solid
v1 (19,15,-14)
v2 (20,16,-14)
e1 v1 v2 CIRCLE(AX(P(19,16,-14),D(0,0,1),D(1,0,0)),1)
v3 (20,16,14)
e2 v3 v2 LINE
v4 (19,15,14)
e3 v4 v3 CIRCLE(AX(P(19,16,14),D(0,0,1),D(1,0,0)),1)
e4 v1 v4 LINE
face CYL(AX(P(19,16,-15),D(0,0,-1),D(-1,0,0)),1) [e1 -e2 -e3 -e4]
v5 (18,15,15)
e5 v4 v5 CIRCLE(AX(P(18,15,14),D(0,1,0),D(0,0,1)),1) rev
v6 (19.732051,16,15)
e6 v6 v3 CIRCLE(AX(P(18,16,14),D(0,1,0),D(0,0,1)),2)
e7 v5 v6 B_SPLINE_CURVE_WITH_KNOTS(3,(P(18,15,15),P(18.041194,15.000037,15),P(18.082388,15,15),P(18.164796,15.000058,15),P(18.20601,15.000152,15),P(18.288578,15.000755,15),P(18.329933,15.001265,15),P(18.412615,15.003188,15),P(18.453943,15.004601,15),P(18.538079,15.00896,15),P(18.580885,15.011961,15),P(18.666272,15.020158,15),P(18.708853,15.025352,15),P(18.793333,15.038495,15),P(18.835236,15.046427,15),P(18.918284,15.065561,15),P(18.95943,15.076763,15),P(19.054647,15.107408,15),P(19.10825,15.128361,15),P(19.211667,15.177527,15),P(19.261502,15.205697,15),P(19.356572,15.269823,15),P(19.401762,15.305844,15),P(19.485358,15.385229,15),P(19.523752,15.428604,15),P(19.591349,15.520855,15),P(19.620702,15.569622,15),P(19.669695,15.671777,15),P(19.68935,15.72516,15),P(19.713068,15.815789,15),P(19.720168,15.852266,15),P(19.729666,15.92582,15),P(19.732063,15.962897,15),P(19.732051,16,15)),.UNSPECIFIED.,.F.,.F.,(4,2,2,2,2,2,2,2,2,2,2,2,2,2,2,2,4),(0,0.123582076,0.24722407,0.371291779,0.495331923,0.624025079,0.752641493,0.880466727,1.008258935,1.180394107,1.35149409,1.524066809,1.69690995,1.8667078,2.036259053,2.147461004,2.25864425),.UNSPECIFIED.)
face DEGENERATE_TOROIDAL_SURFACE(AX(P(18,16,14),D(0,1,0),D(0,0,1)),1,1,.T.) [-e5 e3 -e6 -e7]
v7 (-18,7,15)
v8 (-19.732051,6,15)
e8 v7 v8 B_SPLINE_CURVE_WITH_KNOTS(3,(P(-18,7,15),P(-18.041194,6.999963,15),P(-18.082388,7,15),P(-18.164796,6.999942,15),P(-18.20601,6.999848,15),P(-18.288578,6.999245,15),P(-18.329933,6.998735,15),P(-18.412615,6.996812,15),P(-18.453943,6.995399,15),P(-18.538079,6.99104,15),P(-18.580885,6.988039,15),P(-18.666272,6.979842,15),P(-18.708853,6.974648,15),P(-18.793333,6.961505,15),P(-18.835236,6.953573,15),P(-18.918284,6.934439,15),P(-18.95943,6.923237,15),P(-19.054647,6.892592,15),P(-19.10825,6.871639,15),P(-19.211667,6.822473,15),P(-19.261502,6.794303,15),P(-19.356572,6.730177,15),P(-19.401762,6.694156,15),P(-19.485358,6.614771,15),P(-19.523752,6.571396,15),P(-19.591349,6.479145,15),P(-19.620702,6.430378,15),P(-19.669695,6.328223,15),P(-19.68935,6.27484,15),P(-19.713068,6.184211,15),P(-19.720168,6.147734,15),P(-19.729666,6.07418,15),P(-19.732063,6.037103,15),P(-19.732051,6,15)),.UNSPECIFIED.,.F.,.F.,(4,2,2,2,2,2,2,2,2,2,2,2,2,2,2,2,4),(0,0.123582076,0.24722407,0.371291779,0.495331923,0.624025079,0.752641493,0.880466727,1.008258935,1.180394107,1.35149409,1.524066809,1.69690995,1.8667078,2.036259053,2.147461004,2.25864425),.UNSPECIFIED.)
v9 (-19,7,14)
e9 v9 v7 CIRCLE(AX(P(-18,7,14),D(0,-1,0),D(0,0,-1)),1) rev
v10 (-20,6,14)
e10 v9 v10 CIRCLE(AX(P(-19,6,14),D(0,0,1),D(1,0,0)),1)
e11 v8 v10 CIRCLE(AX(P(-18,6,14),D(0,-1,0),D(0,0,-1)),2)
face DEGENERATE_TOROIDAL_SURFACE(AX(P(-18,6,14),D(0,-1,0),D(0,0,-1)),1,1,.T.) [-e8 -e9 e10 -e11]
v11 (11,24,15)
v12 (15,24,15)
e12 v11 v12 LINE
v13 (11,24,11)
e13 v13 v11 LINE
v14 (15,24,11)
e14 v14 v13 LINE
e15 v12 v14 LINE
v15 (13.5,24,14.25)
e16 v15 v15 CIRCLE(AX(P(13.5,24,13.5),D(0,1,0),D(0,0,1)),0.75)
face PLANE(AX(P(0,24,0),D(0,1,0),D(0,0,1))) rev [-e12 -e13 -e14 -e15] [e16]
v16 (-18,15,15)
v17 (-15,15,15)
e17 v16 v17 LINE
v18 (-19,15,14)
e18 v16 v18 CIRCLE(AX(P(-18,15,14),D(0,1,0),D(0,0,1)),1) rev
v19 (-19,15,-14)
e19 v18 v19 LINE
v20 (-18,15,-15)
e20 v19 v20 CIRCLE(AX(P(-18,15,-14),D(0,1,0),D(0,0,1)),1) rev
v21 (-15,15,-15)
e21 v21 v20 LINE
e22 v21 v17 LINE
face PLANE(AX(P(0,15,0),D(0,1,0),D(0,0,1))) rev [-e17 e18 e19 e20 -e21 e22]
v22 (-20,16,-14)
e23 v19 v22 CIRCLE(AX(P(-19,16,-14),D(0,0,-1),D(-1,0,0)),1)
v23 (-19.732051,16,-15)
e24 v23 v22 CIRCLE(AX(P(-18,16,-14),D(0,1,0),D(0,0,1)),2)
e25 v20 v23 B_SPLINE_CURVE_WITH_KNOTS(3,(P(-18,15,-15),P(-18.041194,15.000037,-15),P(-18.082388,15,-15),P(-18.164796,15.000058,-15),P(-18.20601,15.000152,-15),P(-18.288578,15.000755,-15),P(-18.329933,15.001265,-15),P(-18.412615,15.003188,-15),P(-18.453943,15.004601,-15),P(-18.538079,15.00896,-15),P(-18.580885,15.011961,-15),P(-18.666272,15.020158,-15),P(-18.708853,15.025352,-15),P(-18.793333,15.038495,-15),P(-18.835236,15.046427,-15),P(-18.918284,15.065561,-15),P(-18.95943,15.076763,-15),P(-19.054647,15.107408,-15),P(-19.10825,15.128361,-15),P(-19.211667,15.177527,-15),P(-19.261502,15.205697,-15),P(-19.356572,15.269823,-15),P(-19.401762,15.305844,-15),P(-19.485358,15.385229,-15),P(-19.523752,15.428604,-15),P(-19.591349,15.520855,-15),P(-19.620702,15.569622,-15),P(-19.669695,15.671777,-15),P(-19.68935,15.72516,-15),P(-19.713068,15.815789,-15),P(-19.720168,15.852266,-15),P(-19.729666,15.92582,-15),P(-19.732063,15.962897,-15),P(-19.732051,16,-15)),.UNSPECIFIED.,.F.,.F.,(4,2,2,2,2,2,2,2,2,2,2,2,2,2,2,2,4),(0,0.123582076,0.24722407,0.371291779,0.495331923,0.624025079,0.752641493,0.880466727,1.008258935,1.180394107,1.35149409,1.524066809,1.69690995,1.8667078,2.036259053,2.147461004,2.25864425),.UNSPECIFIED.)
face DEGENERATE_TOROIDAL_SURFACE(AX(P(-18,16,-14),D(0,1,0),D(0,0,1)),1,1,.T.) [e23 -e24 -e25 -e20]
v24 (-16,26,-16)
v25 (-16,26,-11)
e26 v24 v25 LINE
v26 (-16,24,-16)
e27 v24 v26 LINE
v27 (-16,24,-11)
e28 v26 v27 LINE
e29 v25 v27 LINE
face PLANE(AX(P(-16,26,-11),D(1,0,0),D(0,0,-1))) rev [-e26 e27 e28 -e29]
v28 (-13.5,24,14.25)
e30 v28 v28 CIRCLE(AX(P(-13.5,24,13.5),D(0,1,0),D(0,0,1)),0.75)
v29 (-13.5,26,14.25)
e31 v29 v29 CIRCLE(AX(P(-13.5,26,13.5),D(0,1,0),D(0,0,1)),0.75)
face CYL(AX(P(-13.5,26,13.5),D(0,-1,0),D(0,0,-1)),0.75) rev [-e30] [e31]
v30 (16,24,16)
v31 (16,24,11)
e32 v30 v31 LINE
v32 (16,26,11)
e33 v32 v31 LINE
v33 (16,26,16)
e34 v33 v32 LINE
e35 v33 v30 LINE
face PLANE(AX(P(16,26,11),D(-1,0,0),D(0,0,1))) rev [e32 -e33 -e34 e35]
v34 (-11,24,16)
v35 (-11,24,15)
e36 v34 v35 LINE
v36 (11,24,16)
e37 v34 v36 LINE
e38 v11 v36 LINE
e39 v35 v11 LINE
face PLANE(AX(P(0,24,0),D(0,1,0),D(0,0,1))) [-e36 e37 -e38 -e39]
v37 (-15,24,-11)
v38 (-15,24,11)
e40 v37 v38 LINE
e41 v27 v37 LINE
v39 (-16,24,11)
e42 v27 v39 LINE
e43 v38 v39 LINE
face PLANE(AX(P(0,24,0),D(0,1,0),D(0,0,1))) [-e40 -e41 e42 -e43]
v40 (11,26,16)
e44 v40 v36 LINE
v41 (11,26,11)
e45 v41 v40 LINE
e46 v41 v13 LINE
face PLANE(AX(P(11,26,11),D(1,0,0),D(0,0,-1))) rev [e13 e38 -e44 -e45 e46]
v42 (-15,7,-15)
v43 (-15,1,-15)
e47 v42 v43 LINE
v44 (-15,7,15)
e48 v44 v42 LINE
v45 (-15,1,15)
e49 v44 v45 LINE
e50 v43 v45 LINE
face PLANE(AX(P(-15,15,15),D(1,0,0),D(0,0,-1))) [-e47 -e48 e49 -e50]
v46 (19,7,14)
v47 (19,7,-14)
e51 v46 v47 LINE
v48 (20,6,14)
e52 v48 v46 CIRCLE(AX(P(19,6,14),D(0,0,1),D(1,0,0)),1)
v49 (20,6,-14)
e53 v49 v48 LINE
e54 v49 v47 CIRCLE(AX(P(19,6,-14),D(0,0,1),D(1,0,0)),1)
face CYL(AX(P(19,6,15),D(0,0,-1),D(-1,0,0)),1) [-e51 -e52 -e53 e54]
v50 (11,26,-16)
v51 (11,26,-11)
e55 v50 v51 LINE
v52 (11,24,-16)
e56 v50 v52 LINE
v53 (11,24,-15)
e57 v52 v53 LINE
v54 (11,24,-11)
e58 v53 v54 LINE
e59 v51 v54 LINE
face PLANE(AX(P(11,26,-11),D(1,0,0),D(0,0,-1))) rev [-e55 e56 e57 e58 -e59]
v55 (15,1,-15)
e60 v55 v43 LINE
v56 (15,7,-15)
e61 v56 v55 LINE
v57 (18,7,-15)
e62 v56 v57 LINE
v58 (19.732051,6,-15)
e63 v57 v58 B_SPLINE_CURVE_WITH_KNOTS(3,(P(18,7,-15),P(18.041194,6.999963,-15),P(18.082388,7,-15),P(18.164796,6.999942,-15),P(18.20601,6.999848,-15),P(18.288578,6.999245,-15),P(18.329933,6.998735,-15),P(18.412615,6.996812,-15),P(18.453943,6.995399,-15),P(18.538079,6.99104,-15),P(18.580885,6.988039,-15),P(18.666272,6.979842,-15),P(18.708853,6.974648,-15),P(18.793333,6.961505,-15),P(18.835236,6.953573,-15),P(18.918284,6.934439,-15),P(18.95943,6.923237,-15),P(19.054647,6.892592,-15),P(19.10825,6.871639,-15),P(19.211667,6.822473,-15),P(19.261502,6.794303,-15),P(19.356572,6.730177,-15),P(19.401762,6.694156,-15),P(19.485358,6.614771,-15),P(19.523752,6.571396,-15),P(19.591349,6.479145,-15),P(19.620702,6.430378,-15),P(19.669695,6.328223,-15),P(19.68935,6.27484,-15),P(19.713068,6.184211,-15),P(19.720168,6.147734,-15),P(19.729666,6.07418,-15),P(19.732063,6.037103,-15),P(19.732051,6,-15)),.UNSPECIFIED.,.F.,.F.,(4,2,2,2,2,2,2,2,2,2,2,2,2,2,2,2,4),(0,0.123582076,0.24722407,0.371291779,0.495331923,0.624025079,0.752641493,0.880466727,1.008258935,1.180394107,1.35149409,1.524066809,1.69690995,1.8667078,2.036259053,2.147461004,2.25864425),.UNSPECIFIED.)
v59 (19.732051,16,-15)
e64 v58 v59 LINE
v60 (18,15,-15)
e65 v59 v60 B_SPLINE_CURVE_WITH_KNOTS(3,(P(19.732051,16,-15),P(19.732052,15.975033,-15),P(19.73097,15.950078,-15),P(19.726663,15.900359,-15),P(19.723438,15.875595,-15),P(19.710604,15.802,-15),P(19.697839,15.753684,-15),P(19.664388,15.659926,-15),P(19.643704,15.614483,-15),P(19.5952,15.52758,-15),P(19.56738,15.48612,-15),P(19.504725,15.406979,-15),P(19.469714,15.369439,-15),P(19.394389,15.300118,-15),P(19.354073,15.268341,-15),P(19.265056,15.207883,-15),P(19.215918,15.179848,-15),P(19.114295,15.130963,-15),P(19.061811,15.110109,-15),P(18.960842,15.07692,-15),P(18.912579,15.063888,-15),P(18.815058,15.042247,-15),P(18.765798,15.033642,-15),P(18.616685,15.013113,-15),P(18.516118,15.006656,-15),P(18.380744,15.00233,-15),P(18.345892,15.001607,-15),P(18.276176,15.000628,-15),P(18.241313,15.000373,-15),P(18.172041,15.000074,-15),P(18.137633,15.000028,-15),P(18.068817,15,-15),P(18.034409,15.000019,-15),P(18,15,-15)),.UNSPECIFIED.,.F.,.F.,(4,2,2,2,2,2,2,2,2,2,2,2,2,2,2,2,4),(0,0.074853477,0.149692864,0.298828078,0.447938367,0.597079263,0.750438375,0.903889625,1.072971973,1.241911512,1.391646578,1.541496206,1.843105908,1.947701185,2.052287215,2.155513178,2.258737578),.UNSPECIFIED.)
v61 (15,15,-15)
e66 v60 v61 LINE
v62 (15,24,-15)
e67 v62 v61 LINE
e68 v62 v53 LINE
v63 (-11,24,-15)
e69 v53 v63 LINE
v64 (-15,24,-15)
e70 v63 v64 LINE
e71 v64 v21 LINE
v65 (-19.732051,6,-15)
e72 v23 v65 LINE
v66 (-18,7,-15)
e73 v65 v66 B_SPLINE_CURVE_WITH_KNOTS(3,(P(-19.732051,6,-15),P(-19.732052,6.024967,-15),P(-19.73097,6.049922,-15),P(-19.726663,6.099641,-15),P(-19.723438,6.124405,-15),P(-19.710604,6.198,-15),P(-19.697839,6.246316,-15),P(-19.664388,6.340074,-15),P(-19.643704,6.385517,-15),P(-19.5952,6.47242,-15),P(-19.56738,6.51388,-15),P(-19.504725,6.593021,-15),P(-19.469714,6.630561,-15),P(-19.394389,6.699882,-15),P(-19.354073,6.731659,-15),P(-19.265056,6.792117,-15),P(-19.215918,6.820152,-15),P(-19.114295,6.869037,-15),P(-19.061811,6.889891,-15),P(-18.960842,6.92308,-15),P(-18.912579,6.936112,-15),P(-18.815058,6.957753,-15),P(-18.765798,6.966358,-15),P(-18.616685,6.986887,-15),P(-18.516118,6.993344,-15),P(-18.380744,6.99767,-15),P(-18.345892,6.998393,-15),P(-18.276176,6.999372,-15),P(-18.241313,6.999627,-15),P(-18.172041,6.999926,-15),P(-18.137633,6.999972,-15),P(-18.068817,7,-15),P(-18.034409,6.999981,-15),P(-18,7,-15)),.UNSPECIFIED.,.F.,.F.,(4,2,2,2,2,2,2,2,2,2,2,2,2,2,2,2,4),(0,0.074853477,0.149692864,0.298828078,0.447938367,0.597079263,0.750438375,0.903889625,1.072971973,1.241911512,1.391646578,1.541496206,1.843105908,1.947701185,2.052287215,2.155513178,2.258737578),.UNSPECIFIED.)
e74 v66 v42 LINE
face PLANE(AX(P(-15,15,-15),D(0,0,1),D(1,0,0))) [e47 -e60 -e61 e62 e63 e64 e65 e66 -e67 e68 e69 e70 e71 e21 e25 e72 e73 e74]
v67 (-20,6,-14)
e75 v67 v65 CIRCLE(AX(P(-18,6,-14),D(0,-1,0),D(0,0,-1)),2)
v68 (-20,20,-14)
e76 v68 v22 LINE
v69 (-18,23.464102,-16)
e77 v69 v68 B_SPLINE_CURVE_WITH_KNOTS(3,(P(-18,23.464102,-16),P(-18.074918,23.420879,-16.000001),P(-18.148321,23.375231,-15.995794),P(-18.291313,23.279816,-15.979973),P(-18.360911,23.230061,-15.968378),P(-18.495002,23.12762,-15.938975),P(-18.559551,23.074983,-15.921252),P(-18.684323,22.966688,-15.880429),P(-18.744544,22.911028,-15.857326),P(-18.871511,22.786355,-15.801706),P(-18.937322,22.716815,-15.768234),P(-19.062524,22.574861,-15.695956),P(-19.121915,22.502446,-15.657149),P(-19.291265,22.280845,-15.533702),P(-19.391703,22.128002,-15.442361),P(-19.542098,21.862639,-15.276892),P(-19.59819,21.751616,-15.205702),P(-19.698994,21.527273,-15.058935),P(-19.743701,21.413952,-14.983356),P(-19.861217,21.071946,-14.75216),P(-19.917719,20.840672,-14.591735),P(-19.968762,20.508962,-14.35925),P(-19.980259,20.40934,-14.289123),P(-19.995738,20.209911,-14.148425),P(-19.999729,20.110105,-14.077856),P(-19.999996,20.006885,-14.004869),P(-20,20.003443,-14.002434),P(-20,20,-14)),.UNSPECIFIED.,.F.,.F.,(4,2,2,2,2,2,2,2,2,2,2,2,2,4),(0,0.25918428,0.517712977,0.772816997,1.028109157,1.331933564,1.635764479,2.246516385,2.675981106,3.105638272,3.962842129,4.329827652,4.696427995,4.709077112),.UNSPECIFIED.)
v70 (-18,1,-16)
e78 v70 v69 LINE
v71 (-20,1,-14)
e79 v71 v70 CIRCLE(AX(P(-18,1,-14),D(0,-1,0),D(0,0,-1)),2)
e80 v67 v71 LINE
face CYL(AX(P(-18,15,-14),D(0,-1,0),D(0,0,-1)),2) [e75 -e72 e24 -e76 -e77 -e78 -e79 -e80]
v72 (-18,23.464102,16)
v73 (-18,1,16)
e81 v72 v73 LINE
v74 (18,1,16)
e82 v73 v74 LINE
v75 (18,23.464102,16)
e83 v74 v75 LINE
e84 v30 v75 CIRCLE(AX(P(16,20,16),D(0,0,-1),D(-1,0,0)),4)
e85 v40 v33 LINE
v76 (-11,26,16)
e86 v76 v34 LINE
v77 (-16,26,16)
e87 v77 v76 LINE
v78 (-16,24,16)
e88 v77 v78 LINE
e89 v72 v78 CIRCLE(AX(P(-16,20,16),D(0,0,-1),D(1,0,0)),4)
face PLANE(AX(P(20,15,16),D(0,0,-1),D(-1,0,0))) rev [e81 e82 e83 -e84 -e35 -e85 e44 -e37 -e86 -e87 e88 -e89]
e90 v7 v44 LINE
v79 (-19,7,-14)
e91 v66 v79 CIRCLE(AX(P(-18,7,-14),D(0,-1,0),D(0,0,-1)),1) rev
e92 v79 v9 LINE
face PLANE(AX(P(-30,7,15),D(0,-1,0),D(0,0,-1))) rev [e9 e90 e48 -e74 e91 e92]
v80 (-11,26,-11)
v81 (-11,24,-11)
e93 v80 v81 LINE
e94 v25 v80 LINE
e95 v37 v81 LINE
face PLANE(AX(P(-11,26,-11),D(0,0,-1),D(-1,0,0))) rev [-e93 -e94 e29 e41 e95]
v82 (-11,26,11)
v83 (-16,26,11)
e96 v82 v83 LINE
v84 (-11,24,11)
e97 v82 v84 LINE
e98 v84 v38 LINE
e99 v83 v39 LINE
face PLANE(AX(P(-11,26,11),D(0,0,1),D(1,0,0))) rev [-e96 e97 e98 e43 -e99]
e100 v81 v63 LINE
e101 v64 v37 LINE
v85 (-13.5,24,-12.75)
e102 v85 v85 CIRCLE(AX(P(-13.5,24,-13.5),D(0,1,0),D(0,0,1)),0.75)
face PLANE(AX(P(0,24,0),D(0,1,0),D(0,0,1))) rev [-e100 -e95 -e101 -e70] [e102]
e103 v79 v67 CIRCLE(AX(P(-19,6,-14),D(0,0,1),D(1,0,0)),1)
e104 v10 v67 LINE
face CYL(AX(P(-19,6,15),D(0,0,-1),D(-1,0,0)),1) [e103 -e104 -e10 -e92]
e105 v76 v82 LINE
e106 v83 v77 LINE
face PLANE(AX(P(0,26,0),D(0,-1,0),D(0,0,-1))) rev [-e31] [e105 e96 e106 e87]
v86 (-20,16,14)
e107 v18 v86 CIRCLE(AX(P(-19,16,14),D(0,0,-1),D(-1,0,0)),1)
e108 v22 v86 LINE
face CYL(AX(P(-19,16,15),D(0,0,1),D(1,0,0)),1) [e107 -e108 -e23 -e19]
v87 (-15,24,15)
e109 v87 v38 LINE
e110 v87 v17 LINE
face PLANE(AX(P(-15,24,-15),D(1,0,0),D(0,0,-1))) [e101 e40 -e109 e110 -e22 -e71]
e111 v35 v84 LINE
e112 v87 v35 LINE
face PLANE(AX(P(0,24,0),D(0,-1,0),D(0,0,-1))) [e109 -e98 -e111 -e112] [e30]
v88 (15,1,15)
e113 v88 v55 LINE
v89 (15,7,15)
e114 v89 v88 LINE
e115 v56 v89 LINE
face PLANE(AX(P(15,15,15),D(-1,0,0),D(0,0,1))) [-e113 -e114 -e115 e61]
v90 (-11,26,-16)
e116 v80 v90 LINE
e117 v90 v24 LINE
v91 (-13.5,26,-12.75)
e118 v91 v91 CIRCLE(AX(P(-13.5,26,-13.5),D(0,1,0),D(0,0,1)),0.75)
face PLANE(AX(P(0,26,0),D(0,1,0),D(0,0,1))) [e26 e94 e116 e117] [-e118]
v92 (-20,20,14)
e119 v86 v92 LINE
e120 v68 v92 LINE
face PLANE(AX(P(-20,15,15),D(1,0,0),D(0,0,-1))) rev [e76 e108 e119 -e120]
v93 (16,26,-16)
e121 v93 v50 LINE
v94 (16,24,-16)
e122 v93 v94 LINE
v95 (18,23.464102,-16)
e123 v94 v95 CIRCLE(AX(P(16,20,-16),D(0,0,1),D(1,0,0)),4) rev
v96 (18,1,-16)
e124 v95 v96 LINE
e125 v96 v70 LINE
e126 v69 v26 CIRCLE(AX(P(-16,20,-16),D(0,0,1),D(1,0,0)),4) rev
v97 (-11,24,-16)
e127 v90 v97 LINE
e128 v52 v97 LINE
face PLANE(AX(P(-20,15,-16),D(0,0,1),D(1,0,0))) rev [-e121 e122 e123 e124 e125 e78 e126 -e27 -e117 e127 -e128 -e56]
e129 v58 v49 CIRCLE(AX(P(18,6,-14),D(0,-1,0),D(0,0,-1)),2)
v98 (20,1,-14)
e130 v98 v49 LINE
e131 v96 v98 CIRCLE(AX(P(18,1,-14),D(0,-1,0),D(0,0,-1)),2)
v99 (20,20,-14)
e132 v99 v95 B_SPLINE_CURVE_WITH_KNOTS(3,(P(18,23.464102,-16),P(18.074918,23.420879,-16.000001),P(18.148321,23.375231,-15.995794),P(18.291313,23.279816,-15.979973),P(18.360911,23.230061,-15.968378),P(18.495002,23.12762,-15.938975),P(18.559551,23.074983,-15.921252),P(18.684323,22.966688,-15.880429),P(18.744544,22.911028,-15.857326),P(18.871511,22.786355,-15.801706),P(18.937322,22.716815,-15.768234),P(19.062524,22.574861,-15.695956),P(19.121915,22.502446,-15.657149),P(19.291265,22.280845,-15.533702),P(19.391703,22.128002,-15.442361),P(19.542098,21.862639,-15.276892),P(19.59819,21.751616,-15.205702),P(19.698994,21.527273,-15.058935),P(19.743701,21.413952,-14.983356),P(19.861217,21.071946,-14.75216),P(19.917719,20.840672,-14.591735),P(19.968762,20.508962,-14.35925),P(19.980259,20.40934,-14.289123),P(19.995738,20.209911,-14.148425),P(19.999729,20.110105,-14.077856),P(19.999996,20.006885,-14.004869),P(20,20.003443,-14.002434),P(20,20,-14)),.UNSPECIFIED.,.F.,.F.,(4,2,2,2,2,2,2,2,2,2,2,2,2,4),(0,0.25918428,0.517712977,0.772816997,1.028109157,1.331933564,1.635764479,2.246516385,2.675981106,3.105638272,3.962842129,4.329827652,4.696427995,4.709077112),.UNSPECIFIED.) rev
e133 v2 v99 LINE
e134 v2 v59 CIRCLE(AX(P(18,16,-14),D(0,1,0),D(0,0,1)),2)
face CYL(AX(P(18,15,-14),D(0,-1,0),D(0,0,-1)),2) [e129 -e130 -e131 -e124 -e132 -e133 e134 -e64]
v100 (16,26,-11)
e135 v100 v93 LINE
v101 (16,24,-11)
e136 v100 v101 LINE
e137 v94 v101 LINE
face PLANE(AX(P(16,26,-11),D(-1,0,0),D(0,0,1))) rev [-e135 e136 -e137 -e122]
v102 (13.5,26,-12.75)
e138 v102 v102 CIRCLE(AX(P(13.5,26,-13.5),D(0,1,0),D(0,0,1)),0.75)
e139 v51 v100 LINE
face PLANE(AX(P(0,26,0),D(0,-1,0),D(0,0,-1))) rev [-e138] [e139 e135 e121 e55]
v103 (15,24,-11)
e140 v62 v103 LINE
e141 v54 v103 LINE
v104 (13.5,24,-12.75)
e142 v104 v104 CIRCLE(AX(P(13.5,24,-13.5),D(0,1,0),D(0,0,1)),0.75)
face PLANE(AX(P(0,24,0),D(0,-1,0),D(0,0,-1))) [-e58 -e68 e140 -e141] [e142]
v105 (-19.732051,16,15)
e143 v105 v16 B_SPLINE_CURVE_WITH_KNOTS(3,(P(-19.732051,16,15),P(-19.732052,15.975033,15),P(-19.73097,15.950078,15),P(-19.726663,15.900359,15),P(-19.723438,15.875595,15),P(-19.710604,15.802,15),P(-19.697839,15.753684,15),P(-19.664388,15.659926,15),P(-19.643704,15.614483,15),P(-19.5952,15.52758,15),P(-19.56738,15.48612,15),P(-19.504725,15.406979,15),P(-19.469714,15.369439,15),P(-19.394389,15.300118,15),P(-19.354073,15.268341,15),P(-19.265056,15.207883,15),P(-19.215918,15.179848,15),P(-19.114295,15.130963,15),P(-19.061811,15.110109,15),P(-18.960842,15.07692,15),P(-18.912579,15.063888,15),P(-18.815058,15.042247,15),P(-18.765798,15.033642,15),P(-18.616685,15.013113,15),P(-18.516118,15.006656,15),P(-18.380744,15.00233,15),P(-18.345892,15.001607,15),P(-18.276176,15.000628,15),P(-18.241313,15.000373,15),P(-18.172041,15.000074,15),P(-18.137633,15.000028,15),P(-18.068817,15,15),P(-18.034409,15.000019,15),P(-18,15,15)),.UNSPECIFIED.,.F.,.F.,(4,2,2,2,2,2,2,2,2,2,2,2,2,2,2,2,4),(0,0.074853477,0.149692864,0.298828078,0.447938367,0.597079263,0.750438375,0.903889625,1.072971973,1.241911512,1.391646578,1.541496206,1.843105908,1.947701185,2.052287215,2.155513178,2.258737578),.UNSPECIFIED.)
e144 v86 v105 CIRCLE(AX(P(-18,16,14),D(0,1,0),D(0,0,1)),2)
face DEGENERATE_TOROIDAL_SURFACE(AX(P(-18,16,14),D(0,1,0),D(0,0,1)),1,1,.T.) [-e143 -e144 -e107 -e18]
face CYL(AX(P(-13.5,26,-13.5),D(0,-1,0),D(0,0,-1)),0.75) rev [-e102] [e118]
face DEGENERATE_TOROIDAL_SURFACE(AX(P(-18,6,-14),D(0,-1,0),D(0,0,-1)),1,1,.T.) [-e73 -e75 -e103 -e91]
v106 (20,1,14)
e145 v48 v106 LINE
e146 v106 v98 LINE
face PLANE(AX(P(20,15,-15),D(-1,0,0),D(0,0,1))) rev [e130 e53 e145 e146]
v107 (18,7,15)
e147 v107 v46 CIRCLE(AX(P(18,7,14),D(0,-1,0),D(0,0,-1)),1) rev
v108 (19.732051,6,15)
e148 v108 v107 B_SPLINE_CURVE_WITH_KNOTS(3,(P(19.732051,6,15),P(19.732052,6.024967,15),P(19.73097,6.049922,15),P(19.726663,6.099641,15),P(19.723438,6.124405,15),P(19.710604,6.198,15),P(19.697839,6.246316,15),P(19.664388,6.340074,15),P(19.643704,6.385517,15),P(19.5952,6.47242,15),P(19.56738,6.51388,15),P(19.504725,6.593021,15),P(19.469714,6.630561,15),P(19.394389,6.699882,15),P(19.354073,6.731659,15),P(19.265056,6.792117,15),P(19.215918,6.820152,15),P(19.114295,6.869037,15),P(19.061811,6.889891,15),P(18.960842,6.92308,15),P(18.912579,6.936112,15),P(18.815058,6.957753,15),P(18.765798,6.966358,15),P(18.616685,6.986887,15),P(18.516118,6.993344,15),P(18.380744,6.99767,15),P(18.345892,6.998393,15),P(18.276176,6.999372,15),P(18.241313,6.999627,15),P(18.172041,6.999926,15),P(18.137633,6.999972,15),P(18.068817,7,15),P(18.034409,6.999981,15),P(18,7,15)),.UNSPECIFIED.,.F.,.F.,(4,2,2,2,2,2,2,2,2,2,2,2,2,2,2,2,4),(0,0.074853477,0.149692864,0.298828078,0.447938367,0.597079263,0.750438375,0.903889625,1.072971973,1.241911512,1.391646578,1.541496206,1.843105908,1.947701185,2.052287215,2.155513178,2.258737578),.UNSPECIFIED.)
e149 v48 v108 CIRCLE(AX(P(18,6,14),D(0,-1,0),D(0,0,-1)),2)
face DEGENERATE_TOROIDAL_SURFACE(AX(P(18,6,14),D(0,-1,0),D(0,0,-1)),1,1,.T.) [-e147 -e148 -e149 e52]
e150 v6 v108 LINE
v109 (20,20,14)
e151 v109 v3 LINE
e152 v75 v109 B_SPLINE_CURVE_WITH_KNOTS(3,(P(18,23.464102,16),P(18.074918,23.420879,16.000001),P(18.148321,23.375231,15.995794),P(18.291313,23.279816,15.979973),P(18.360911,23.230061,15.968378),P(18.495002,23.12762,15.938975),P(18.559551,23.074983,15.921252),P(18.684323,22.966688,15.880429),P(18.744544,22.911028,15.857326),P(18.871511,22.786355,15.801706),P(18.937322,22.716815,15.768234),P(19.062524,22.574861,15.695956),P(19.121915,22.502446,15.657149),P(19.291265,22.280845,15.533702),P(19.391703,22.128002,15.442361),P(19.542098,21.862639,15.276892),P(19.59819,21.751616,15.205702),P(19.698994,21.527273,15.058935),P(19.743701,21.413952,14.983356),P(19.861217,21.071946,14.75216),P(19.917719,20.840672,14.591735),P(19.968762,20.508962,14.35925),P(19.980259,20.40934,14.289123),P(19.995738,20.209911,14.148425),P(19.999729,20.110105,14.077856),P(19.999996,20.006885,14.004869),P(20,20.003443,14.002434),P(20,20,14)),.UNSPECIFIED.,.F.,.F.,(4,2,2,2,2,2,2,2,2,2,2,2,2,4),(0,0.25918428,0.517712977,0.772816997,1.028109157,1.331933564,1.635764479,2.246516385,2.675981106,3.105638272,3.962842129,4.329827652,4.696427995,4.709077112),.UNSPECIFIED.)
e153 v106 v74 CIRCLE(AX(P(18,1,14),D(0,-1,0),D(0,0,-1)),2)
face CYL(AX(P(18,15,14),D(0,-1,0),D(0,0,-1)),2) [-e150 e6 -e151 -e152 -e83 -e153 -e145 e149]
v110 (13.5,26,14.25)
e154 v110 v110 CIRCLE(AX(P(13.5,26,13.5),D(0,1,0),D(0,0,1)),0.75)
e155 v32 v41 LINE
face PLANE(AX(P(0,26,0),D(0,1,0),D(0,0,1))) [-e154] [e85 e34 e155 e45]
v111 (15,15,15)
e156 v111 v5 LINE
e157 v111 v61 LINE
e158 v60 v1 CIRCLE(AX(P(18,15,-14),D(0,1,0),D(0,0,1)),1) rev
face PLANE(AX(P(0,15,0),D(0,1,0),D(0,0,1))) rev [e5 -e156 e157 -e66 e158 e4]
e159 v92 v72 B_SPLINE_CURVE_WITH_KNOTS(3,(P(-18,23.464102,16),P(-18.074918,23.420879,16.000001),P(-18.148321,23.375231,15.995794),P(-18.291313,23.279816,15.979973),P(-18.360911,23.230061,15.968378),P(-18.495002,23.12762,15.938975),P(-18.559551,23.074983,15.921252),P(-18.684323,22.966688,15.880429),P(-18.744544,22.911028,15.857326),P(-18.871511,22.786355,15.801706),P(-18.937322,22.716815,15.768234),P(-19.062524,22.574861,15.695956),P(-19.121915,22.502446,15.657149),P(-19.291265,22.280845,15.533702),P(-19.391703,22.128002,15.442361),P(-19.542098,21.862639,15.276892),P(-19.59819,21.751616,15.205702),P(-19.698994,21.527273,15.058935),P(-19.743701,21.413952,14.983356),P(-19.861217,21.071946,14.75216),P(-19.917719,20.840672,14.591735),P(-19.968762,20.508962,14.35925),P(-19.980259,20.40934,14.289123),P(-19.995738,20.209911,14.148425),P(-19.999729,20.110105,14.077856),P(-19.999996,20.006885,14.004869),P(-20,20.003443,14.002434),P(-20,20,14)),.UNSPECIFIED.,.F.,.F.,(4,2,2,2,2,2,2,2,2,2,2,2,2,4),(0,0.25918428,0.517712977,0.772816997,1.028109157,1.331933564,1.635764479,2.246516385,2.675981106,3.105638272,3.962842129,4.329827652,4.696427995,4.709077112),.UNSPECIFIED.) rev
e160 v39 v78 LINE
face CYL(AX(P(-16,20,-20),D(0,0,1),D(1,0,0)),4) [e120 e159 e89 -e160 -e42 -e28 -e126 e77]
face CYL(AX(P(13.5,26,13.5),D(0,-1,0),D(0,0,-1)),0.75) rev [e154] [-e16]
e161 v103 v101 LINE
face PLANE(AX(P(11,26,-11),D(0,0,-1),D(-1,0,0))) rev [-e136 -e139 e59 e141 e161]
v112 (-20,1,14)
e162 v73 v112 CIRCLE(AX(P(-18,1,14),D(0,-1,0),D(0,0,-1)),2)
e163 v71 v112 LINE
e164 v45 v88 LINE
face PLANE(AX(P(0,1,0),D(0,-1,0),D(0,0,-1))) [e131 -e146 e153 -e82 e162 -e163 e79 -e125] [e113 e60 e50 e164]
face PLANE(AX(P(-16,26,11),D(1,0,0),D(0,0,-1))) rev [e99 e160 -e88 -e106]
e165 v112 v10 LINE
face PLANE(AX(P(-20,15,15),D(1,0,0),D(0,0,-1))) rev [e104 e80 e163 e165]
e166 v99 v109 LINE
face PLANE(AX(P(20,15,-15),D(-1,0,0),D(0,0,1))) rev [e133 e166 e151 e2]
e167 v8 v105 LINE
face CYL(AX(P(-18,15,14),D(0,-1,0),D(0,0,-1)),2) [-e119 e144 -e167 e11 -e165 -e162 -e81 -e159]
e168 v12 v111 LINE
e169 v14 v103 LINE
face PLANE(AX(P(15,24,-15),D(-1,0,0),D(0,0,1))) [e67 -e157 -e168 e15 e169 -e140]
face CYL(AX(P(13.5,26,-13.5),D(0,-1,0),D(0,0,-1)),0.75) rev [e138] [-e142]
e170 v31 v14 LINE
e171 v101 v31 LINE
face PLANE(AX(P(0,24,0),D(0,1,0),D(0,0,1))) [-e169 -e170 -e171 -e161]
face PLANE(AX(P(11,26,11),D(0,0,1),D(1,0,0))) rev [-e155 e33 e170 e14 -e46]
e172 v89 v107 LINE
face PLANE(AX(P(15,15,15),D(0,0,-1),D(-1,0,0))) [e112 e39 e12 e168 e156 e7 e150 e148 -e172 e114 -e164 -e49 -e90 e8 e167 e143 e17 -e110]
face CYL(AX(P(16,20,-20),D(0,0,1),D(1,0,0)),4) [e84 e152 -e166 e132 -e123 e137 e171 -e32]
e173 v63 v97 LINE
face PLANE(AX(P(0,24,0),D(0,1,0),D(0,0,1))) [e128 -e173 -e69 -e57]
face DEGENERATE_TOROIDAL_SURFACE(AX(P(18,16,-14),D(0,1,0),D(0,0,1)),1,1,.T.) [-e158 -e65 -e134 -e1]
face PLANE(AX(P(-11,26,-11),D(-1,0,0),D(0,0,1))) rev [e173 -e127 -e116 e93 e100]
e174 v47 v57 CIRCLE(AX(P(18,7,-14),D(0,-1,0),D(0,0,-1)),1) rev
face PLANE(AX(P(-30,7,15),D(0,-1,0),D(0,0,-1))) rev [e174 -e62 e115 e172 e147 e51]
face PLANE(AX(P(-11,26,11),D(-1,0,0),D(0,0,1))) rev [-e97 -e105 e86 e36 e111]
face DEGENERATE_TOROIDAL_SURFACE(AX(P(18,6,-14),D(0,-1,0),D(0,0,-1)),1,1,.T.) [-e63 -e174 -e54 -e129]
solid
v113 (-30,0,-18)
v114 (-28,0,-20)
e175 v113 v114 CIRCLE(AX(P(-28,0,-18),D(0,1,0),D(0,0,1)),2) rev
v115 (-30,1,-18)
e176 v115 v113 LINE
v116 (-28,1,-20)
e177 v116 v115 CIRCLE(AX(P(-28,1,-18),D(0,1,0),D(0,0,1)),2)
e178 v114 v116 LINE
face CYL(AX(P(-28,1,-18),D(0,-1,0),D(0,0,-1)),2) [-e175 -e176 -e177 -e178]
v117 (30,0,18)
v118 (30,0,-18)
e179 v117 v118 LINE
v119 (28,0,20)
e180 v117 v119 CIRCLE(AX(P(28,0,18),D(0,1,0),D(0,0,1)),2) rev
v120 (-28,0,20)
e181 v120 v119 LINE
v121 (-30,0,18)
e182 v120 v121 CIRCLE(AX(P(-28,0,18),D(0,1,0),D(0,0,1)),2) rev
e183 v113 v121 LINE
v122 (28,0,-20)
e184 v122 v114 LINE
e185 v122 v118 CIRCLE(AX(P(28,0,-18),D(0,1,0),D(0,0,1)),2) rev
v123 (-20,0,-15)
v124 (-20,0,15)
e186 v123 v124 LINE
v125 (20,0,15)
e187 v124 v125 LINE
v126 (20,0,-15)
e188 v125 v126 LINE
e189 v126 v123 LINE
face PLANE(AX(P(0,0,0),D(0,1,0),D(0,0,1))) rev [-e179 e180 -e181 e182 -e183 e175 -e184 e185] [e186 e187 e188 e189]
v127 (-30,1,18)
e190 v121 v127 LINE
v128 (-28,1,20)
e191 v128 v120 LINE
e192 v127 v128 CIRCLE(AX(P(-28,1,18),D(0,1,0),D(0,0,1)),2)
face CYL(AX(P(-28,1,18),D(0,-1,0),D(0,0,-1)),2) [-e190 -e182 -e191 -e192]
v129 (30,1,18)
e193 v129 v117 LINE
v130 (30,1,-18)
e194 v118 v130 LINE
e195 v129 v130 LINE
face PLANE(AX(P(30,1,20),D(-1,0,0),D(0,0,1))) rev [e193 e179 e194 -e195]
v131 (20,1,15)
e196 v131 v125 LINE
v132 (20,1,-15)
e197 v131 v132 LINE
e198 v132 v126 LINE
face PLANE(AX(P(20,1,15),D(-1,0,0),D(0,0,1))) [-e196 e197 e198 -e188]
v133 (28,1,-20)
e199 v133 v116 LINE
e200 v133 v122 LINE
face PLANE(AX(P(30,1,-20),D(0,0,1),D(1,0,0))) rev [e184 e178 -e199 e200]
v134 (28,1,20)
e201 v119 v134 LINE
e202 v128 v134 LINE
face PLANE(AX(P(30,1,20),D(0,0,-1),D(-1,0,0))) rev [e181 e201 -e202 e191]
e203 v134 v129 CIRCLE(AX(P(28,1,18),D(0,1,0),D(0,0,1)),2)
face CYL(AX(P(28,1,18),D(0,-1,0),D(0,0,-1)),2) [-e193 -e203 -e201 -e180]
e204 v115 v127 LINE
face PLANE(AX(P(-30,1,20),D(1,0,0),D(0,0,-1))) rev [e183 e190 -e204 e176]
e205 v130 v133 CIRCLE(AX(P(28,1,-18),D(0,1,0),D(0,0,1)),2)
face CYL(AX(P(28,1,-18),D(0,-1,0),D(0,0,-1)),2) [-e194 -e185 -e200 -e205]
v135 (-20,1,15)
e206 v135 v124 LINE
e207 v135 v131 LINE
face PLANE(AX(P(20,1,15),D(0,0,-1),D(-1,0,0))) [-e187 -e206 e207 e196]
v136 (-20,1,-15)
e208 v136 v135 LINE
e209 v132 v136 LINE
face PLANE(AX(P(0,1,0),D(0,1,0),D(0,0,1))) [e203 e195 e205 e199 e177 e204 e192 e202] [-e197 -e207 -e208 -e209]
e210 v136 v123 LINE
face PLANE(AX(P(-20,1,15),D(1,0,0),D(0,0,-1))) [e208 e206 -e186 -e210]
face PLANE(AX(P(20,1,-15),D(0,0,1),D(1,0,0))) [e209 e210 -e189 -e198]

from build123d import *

# Parameters (mm, degrees)
SKETCH1_W           = 60
SKETCH1_H           = 40
SKETCH1_W_2         = 40
SKETCH1_H_2         = 30
BOSS_EXTRUDE1_DEPTH = 1
SKETCH2_W           = 30
SKETCH2_H           = 30
BOSS_EXTRUDE2_DEPTH = 14
SKETCH3_W           = 30
SKETCH3_H           = 8
CUT_EXTRUDE1_DEPTH  = 56.901699437
SKETCH4_W           = 40
SKETCH4_H           = 32
SKETCH4_W_2         = 30
SKETCH4_H_2         = 30
BOSS_EXTRUDE3_DEPTH = 9
FILLET1_R           = 2
FILLET2_R           = 2
FILLET4_R           = 1
CUT_EXTRUDE2_DEPTH  = 53.64978637
SKETCH7_W           = 5
SKETCH7_H           = 5
SKETCH7_R           = 0.75
BOSS_EXTRUDE5_DEPTH = 2


# Some blends are built 0.0001 mm under size
with BuildPart() as part:
    # Sketch1 → Boss-Extrude1 (new body)
    with BuildSketch(Plane(origin=(0, 0, 0), x_dir=(1, 0, 0), z_dir=(0, 1, 0))):
        Rectangle(SKETCH1_W, SKETCH1_H)
        Rectangle(SKETCH1_W_2, SKETCH1_H_2, mode=Mode.SUBTRACT)
    extrude(amount=BOSS_EXTRUDE1_DEPTH)

    # Fillet1
    fillet1_edges = [part.edges().sort_by_distance(p)[0] for p in [
        (-30, 0.5, -20),
        (30, 0.5, -20),
        (30, 0.5, 20),
        (-30, 0.5, 20),
    ]]
    fillet(fillet1_edges, radius=FILLET1_R)


with BuildPart() as body_2:
    # Sketch2 → Boss-Extrude2 (new body)
    with BuildSketch(Plane(origin=(0, 1, 0), x_dir=(1, 0, 0), z_dir=(0, 1, 0))):
        Polygon((20, -15), (20, 15), (20, 16), (-20, 16), (-20, 15), (-20, -15), (-20, -16), (20, -16), align=None)
        Rectangle(SKETCH2_W, SKETCH2_H, mode=Mode.SUBTRACT)
    extrude(amount=BOSS_EXTRUDE2_DEPTH)

    # Sketch3 → Cut-Extrude1 (cut, through all)
    with BuildSketch(Plane(origin=(20, 0, 0), x_dir=(0, 0, -1), z_dir=(1, 0, 0))):
        with Locations((0, 11)):
            Rectangle(SKETCH3_W, SKETCH3_H)
    extrude(amount=-CUT_EXTRUDE1_DEPTH, mode=Mode.SUBTRACT)

    # Sketch4 → Boss-Extrude3 (add)
    with BuildSketch(Plane(origin=(0, 15, 0), x_dir=(1, 0, 0), z_dir=(0, 1, 0))):
        Rectangle(SKETCH4_W, SKETCH4_H)
        Rectangle(SKETCH4_W_2, SKETCH4_H_2, mode=Mode.SUBTRACT)
    extrude(amount=BOSS_EXTRUDE3_DEPTH)

    # Fillet2
    # the kernel refuses this fillet: 2 mm, written as the material it takes off along each edge
    with BuildSketch(Plane(origin=(20, -4, -16), x_dir=(0, 0, 1), z_dir=(0, 1, 0)), Plane(origin=(20, 29, 16), x_dir=(0, 0, -1), z_dir=(0, -1, 0))) as fillet2_piece_1:
        with BuildLine():
            CenterArc((FILLET2_R, -FILLET2_R), FILLET2_R, 90, 90)
            Line((0, -FILLET2_R), (0, 0))
            Line((0, 0), (FILLET2_R, 0))
        make_face()
    extrude(amount=33, mode=Mode.SUBTRACT)
    with BuildSketch(Plane(origin=(-20, -4, -16), x_dir=(0, 0, 1), z_dir=(0, 1, 0)), Plane(origin=(-20, 29, 16), x_dir=(0, 0, -1), z_dir=(0, -1, 0))) as fillet2_piece_2:
        with BuildLine():
            CenterArc((FILLET2_R, FILLET2_R), FILLET2_R, 180, 90)
            Line((0, FILLET2_R), (0, 0))
            Line((0, 0), (FILLET2_R, 0))
        make_face()
    extrude(amount=33, mode=Mode.SUBTRACT)

    # Fillet4
    fillet4_edges = [body_2.edges().sort_by_distance(p)[0] for p in [
        (20, 15, 0),
        (20, 7, 0),
        (19.931851653, 7, 14.51763809),
        (19.931851653, 7, -14.51763809),
        (19.931851653, 15, 14.51763809),
        (19.931851653, 15, -14.51763809),
        (-20, 15, 0),
        (-20, 7, 0),
        (-19.931851653, 15, 14.51763809),
        (-19.931851653, 15, -14.51763809),
        (-19.931851653, 7, 14.51763809),
        (-19.931851653, 7, -14.51763809),
    ]]
    fillet(fillet4_edges, radius=FILLET4_R - 0.0001)  # a hair under: the kernel refuses the full size

    # Sketch5 → Cut-Extrude2 (cut, through all)
    with BuildSketch(Plane.XY.offset(16)):
        with BuildLine():
            Line((-20, 20), (-20, 24))
            Line((-20, 24), (-16, 24))
            ThreePointArc((-16, 24), (-18.828427125, 22.828427125), (-20, 20))
        make_face()
        with BuildLine():
            Line((20, 20), (20, 24))
            Line((20, 24), (16, 24))
            ThreePointArc((16, 24), (18.828427125, 22.828427125), (20, 20))
        make_face()
    extrude(amount=-CUT_EXTRUDE2_DEPTH, mode=Mode.SUBTRACT)

    # Sketch7 → Boss-Extrude5 (add)
    # profile 1 of 4: a face of its own
    with BuildSketch(Plane(origin=(0, 24, 0), x_dir=(1, 0, 0), z_dir=(0, 1, 0))):
        with Locations((-13.5, 13.5)):
            Rectangle(SKETCH7_W, SKETCH7_H)
        with Locations(Location((-13.5, 13.5, 0), (0, 0, 270))):
            Circle(SKETCH7_R, mode=Mode.SUBTRACT)
    # profile 2 of 4: a face of its own
    with BuildSketch(Plane(origin=(0, 24, 0), x_dir=(1, 0, 0), z_dir=(0, 1, 0))):
        with Locations((13.5, 13.5)):
            Rectangle(SKETCH7_W, SKETCH7_H)
        with Locations(Location((13.5, 13.5, 0), (0, 0, 270))):
            Circle(SKETCH7_R, mode=Mode.SUBTRACT)
    # profile 3 of 4: a face of its own
    with BuildSketch(Plane(origin=(0, 24, 0), x_dir=(1, 0, 0), z_dir=(0, 1, 0))):
        with Locations((13.5, -13.5)):
            Rectangle(SKETCH7_W, SKETCH7_H)
        with Locations(Location((13.5, -13.5, 0), (0, 0, 270))):
            Circle(SKETCH7_R, mode=Mode.SUBTRACT)
    # profile 4 of 4: a face of its own
    with BuildSketch(Plane(origin=(0, 24, 0), x_dir=(1, 0, 0), z_dir=(0, 1, 0))):
        with Locations((-13.5, -13.5)):
            Rectangle(SKETCH7_W, SKETCH7_H)
        with Locations(Location((-13.5, -13.5, 0), (0, 0, 270))):
            Circle(SKETCH7_R, mode=Mode.SUBTRACT)
    extrude(amount=BOSS_EXTRUDE5_DEPTH)


solid = Compound([part.part, body_2.part])
